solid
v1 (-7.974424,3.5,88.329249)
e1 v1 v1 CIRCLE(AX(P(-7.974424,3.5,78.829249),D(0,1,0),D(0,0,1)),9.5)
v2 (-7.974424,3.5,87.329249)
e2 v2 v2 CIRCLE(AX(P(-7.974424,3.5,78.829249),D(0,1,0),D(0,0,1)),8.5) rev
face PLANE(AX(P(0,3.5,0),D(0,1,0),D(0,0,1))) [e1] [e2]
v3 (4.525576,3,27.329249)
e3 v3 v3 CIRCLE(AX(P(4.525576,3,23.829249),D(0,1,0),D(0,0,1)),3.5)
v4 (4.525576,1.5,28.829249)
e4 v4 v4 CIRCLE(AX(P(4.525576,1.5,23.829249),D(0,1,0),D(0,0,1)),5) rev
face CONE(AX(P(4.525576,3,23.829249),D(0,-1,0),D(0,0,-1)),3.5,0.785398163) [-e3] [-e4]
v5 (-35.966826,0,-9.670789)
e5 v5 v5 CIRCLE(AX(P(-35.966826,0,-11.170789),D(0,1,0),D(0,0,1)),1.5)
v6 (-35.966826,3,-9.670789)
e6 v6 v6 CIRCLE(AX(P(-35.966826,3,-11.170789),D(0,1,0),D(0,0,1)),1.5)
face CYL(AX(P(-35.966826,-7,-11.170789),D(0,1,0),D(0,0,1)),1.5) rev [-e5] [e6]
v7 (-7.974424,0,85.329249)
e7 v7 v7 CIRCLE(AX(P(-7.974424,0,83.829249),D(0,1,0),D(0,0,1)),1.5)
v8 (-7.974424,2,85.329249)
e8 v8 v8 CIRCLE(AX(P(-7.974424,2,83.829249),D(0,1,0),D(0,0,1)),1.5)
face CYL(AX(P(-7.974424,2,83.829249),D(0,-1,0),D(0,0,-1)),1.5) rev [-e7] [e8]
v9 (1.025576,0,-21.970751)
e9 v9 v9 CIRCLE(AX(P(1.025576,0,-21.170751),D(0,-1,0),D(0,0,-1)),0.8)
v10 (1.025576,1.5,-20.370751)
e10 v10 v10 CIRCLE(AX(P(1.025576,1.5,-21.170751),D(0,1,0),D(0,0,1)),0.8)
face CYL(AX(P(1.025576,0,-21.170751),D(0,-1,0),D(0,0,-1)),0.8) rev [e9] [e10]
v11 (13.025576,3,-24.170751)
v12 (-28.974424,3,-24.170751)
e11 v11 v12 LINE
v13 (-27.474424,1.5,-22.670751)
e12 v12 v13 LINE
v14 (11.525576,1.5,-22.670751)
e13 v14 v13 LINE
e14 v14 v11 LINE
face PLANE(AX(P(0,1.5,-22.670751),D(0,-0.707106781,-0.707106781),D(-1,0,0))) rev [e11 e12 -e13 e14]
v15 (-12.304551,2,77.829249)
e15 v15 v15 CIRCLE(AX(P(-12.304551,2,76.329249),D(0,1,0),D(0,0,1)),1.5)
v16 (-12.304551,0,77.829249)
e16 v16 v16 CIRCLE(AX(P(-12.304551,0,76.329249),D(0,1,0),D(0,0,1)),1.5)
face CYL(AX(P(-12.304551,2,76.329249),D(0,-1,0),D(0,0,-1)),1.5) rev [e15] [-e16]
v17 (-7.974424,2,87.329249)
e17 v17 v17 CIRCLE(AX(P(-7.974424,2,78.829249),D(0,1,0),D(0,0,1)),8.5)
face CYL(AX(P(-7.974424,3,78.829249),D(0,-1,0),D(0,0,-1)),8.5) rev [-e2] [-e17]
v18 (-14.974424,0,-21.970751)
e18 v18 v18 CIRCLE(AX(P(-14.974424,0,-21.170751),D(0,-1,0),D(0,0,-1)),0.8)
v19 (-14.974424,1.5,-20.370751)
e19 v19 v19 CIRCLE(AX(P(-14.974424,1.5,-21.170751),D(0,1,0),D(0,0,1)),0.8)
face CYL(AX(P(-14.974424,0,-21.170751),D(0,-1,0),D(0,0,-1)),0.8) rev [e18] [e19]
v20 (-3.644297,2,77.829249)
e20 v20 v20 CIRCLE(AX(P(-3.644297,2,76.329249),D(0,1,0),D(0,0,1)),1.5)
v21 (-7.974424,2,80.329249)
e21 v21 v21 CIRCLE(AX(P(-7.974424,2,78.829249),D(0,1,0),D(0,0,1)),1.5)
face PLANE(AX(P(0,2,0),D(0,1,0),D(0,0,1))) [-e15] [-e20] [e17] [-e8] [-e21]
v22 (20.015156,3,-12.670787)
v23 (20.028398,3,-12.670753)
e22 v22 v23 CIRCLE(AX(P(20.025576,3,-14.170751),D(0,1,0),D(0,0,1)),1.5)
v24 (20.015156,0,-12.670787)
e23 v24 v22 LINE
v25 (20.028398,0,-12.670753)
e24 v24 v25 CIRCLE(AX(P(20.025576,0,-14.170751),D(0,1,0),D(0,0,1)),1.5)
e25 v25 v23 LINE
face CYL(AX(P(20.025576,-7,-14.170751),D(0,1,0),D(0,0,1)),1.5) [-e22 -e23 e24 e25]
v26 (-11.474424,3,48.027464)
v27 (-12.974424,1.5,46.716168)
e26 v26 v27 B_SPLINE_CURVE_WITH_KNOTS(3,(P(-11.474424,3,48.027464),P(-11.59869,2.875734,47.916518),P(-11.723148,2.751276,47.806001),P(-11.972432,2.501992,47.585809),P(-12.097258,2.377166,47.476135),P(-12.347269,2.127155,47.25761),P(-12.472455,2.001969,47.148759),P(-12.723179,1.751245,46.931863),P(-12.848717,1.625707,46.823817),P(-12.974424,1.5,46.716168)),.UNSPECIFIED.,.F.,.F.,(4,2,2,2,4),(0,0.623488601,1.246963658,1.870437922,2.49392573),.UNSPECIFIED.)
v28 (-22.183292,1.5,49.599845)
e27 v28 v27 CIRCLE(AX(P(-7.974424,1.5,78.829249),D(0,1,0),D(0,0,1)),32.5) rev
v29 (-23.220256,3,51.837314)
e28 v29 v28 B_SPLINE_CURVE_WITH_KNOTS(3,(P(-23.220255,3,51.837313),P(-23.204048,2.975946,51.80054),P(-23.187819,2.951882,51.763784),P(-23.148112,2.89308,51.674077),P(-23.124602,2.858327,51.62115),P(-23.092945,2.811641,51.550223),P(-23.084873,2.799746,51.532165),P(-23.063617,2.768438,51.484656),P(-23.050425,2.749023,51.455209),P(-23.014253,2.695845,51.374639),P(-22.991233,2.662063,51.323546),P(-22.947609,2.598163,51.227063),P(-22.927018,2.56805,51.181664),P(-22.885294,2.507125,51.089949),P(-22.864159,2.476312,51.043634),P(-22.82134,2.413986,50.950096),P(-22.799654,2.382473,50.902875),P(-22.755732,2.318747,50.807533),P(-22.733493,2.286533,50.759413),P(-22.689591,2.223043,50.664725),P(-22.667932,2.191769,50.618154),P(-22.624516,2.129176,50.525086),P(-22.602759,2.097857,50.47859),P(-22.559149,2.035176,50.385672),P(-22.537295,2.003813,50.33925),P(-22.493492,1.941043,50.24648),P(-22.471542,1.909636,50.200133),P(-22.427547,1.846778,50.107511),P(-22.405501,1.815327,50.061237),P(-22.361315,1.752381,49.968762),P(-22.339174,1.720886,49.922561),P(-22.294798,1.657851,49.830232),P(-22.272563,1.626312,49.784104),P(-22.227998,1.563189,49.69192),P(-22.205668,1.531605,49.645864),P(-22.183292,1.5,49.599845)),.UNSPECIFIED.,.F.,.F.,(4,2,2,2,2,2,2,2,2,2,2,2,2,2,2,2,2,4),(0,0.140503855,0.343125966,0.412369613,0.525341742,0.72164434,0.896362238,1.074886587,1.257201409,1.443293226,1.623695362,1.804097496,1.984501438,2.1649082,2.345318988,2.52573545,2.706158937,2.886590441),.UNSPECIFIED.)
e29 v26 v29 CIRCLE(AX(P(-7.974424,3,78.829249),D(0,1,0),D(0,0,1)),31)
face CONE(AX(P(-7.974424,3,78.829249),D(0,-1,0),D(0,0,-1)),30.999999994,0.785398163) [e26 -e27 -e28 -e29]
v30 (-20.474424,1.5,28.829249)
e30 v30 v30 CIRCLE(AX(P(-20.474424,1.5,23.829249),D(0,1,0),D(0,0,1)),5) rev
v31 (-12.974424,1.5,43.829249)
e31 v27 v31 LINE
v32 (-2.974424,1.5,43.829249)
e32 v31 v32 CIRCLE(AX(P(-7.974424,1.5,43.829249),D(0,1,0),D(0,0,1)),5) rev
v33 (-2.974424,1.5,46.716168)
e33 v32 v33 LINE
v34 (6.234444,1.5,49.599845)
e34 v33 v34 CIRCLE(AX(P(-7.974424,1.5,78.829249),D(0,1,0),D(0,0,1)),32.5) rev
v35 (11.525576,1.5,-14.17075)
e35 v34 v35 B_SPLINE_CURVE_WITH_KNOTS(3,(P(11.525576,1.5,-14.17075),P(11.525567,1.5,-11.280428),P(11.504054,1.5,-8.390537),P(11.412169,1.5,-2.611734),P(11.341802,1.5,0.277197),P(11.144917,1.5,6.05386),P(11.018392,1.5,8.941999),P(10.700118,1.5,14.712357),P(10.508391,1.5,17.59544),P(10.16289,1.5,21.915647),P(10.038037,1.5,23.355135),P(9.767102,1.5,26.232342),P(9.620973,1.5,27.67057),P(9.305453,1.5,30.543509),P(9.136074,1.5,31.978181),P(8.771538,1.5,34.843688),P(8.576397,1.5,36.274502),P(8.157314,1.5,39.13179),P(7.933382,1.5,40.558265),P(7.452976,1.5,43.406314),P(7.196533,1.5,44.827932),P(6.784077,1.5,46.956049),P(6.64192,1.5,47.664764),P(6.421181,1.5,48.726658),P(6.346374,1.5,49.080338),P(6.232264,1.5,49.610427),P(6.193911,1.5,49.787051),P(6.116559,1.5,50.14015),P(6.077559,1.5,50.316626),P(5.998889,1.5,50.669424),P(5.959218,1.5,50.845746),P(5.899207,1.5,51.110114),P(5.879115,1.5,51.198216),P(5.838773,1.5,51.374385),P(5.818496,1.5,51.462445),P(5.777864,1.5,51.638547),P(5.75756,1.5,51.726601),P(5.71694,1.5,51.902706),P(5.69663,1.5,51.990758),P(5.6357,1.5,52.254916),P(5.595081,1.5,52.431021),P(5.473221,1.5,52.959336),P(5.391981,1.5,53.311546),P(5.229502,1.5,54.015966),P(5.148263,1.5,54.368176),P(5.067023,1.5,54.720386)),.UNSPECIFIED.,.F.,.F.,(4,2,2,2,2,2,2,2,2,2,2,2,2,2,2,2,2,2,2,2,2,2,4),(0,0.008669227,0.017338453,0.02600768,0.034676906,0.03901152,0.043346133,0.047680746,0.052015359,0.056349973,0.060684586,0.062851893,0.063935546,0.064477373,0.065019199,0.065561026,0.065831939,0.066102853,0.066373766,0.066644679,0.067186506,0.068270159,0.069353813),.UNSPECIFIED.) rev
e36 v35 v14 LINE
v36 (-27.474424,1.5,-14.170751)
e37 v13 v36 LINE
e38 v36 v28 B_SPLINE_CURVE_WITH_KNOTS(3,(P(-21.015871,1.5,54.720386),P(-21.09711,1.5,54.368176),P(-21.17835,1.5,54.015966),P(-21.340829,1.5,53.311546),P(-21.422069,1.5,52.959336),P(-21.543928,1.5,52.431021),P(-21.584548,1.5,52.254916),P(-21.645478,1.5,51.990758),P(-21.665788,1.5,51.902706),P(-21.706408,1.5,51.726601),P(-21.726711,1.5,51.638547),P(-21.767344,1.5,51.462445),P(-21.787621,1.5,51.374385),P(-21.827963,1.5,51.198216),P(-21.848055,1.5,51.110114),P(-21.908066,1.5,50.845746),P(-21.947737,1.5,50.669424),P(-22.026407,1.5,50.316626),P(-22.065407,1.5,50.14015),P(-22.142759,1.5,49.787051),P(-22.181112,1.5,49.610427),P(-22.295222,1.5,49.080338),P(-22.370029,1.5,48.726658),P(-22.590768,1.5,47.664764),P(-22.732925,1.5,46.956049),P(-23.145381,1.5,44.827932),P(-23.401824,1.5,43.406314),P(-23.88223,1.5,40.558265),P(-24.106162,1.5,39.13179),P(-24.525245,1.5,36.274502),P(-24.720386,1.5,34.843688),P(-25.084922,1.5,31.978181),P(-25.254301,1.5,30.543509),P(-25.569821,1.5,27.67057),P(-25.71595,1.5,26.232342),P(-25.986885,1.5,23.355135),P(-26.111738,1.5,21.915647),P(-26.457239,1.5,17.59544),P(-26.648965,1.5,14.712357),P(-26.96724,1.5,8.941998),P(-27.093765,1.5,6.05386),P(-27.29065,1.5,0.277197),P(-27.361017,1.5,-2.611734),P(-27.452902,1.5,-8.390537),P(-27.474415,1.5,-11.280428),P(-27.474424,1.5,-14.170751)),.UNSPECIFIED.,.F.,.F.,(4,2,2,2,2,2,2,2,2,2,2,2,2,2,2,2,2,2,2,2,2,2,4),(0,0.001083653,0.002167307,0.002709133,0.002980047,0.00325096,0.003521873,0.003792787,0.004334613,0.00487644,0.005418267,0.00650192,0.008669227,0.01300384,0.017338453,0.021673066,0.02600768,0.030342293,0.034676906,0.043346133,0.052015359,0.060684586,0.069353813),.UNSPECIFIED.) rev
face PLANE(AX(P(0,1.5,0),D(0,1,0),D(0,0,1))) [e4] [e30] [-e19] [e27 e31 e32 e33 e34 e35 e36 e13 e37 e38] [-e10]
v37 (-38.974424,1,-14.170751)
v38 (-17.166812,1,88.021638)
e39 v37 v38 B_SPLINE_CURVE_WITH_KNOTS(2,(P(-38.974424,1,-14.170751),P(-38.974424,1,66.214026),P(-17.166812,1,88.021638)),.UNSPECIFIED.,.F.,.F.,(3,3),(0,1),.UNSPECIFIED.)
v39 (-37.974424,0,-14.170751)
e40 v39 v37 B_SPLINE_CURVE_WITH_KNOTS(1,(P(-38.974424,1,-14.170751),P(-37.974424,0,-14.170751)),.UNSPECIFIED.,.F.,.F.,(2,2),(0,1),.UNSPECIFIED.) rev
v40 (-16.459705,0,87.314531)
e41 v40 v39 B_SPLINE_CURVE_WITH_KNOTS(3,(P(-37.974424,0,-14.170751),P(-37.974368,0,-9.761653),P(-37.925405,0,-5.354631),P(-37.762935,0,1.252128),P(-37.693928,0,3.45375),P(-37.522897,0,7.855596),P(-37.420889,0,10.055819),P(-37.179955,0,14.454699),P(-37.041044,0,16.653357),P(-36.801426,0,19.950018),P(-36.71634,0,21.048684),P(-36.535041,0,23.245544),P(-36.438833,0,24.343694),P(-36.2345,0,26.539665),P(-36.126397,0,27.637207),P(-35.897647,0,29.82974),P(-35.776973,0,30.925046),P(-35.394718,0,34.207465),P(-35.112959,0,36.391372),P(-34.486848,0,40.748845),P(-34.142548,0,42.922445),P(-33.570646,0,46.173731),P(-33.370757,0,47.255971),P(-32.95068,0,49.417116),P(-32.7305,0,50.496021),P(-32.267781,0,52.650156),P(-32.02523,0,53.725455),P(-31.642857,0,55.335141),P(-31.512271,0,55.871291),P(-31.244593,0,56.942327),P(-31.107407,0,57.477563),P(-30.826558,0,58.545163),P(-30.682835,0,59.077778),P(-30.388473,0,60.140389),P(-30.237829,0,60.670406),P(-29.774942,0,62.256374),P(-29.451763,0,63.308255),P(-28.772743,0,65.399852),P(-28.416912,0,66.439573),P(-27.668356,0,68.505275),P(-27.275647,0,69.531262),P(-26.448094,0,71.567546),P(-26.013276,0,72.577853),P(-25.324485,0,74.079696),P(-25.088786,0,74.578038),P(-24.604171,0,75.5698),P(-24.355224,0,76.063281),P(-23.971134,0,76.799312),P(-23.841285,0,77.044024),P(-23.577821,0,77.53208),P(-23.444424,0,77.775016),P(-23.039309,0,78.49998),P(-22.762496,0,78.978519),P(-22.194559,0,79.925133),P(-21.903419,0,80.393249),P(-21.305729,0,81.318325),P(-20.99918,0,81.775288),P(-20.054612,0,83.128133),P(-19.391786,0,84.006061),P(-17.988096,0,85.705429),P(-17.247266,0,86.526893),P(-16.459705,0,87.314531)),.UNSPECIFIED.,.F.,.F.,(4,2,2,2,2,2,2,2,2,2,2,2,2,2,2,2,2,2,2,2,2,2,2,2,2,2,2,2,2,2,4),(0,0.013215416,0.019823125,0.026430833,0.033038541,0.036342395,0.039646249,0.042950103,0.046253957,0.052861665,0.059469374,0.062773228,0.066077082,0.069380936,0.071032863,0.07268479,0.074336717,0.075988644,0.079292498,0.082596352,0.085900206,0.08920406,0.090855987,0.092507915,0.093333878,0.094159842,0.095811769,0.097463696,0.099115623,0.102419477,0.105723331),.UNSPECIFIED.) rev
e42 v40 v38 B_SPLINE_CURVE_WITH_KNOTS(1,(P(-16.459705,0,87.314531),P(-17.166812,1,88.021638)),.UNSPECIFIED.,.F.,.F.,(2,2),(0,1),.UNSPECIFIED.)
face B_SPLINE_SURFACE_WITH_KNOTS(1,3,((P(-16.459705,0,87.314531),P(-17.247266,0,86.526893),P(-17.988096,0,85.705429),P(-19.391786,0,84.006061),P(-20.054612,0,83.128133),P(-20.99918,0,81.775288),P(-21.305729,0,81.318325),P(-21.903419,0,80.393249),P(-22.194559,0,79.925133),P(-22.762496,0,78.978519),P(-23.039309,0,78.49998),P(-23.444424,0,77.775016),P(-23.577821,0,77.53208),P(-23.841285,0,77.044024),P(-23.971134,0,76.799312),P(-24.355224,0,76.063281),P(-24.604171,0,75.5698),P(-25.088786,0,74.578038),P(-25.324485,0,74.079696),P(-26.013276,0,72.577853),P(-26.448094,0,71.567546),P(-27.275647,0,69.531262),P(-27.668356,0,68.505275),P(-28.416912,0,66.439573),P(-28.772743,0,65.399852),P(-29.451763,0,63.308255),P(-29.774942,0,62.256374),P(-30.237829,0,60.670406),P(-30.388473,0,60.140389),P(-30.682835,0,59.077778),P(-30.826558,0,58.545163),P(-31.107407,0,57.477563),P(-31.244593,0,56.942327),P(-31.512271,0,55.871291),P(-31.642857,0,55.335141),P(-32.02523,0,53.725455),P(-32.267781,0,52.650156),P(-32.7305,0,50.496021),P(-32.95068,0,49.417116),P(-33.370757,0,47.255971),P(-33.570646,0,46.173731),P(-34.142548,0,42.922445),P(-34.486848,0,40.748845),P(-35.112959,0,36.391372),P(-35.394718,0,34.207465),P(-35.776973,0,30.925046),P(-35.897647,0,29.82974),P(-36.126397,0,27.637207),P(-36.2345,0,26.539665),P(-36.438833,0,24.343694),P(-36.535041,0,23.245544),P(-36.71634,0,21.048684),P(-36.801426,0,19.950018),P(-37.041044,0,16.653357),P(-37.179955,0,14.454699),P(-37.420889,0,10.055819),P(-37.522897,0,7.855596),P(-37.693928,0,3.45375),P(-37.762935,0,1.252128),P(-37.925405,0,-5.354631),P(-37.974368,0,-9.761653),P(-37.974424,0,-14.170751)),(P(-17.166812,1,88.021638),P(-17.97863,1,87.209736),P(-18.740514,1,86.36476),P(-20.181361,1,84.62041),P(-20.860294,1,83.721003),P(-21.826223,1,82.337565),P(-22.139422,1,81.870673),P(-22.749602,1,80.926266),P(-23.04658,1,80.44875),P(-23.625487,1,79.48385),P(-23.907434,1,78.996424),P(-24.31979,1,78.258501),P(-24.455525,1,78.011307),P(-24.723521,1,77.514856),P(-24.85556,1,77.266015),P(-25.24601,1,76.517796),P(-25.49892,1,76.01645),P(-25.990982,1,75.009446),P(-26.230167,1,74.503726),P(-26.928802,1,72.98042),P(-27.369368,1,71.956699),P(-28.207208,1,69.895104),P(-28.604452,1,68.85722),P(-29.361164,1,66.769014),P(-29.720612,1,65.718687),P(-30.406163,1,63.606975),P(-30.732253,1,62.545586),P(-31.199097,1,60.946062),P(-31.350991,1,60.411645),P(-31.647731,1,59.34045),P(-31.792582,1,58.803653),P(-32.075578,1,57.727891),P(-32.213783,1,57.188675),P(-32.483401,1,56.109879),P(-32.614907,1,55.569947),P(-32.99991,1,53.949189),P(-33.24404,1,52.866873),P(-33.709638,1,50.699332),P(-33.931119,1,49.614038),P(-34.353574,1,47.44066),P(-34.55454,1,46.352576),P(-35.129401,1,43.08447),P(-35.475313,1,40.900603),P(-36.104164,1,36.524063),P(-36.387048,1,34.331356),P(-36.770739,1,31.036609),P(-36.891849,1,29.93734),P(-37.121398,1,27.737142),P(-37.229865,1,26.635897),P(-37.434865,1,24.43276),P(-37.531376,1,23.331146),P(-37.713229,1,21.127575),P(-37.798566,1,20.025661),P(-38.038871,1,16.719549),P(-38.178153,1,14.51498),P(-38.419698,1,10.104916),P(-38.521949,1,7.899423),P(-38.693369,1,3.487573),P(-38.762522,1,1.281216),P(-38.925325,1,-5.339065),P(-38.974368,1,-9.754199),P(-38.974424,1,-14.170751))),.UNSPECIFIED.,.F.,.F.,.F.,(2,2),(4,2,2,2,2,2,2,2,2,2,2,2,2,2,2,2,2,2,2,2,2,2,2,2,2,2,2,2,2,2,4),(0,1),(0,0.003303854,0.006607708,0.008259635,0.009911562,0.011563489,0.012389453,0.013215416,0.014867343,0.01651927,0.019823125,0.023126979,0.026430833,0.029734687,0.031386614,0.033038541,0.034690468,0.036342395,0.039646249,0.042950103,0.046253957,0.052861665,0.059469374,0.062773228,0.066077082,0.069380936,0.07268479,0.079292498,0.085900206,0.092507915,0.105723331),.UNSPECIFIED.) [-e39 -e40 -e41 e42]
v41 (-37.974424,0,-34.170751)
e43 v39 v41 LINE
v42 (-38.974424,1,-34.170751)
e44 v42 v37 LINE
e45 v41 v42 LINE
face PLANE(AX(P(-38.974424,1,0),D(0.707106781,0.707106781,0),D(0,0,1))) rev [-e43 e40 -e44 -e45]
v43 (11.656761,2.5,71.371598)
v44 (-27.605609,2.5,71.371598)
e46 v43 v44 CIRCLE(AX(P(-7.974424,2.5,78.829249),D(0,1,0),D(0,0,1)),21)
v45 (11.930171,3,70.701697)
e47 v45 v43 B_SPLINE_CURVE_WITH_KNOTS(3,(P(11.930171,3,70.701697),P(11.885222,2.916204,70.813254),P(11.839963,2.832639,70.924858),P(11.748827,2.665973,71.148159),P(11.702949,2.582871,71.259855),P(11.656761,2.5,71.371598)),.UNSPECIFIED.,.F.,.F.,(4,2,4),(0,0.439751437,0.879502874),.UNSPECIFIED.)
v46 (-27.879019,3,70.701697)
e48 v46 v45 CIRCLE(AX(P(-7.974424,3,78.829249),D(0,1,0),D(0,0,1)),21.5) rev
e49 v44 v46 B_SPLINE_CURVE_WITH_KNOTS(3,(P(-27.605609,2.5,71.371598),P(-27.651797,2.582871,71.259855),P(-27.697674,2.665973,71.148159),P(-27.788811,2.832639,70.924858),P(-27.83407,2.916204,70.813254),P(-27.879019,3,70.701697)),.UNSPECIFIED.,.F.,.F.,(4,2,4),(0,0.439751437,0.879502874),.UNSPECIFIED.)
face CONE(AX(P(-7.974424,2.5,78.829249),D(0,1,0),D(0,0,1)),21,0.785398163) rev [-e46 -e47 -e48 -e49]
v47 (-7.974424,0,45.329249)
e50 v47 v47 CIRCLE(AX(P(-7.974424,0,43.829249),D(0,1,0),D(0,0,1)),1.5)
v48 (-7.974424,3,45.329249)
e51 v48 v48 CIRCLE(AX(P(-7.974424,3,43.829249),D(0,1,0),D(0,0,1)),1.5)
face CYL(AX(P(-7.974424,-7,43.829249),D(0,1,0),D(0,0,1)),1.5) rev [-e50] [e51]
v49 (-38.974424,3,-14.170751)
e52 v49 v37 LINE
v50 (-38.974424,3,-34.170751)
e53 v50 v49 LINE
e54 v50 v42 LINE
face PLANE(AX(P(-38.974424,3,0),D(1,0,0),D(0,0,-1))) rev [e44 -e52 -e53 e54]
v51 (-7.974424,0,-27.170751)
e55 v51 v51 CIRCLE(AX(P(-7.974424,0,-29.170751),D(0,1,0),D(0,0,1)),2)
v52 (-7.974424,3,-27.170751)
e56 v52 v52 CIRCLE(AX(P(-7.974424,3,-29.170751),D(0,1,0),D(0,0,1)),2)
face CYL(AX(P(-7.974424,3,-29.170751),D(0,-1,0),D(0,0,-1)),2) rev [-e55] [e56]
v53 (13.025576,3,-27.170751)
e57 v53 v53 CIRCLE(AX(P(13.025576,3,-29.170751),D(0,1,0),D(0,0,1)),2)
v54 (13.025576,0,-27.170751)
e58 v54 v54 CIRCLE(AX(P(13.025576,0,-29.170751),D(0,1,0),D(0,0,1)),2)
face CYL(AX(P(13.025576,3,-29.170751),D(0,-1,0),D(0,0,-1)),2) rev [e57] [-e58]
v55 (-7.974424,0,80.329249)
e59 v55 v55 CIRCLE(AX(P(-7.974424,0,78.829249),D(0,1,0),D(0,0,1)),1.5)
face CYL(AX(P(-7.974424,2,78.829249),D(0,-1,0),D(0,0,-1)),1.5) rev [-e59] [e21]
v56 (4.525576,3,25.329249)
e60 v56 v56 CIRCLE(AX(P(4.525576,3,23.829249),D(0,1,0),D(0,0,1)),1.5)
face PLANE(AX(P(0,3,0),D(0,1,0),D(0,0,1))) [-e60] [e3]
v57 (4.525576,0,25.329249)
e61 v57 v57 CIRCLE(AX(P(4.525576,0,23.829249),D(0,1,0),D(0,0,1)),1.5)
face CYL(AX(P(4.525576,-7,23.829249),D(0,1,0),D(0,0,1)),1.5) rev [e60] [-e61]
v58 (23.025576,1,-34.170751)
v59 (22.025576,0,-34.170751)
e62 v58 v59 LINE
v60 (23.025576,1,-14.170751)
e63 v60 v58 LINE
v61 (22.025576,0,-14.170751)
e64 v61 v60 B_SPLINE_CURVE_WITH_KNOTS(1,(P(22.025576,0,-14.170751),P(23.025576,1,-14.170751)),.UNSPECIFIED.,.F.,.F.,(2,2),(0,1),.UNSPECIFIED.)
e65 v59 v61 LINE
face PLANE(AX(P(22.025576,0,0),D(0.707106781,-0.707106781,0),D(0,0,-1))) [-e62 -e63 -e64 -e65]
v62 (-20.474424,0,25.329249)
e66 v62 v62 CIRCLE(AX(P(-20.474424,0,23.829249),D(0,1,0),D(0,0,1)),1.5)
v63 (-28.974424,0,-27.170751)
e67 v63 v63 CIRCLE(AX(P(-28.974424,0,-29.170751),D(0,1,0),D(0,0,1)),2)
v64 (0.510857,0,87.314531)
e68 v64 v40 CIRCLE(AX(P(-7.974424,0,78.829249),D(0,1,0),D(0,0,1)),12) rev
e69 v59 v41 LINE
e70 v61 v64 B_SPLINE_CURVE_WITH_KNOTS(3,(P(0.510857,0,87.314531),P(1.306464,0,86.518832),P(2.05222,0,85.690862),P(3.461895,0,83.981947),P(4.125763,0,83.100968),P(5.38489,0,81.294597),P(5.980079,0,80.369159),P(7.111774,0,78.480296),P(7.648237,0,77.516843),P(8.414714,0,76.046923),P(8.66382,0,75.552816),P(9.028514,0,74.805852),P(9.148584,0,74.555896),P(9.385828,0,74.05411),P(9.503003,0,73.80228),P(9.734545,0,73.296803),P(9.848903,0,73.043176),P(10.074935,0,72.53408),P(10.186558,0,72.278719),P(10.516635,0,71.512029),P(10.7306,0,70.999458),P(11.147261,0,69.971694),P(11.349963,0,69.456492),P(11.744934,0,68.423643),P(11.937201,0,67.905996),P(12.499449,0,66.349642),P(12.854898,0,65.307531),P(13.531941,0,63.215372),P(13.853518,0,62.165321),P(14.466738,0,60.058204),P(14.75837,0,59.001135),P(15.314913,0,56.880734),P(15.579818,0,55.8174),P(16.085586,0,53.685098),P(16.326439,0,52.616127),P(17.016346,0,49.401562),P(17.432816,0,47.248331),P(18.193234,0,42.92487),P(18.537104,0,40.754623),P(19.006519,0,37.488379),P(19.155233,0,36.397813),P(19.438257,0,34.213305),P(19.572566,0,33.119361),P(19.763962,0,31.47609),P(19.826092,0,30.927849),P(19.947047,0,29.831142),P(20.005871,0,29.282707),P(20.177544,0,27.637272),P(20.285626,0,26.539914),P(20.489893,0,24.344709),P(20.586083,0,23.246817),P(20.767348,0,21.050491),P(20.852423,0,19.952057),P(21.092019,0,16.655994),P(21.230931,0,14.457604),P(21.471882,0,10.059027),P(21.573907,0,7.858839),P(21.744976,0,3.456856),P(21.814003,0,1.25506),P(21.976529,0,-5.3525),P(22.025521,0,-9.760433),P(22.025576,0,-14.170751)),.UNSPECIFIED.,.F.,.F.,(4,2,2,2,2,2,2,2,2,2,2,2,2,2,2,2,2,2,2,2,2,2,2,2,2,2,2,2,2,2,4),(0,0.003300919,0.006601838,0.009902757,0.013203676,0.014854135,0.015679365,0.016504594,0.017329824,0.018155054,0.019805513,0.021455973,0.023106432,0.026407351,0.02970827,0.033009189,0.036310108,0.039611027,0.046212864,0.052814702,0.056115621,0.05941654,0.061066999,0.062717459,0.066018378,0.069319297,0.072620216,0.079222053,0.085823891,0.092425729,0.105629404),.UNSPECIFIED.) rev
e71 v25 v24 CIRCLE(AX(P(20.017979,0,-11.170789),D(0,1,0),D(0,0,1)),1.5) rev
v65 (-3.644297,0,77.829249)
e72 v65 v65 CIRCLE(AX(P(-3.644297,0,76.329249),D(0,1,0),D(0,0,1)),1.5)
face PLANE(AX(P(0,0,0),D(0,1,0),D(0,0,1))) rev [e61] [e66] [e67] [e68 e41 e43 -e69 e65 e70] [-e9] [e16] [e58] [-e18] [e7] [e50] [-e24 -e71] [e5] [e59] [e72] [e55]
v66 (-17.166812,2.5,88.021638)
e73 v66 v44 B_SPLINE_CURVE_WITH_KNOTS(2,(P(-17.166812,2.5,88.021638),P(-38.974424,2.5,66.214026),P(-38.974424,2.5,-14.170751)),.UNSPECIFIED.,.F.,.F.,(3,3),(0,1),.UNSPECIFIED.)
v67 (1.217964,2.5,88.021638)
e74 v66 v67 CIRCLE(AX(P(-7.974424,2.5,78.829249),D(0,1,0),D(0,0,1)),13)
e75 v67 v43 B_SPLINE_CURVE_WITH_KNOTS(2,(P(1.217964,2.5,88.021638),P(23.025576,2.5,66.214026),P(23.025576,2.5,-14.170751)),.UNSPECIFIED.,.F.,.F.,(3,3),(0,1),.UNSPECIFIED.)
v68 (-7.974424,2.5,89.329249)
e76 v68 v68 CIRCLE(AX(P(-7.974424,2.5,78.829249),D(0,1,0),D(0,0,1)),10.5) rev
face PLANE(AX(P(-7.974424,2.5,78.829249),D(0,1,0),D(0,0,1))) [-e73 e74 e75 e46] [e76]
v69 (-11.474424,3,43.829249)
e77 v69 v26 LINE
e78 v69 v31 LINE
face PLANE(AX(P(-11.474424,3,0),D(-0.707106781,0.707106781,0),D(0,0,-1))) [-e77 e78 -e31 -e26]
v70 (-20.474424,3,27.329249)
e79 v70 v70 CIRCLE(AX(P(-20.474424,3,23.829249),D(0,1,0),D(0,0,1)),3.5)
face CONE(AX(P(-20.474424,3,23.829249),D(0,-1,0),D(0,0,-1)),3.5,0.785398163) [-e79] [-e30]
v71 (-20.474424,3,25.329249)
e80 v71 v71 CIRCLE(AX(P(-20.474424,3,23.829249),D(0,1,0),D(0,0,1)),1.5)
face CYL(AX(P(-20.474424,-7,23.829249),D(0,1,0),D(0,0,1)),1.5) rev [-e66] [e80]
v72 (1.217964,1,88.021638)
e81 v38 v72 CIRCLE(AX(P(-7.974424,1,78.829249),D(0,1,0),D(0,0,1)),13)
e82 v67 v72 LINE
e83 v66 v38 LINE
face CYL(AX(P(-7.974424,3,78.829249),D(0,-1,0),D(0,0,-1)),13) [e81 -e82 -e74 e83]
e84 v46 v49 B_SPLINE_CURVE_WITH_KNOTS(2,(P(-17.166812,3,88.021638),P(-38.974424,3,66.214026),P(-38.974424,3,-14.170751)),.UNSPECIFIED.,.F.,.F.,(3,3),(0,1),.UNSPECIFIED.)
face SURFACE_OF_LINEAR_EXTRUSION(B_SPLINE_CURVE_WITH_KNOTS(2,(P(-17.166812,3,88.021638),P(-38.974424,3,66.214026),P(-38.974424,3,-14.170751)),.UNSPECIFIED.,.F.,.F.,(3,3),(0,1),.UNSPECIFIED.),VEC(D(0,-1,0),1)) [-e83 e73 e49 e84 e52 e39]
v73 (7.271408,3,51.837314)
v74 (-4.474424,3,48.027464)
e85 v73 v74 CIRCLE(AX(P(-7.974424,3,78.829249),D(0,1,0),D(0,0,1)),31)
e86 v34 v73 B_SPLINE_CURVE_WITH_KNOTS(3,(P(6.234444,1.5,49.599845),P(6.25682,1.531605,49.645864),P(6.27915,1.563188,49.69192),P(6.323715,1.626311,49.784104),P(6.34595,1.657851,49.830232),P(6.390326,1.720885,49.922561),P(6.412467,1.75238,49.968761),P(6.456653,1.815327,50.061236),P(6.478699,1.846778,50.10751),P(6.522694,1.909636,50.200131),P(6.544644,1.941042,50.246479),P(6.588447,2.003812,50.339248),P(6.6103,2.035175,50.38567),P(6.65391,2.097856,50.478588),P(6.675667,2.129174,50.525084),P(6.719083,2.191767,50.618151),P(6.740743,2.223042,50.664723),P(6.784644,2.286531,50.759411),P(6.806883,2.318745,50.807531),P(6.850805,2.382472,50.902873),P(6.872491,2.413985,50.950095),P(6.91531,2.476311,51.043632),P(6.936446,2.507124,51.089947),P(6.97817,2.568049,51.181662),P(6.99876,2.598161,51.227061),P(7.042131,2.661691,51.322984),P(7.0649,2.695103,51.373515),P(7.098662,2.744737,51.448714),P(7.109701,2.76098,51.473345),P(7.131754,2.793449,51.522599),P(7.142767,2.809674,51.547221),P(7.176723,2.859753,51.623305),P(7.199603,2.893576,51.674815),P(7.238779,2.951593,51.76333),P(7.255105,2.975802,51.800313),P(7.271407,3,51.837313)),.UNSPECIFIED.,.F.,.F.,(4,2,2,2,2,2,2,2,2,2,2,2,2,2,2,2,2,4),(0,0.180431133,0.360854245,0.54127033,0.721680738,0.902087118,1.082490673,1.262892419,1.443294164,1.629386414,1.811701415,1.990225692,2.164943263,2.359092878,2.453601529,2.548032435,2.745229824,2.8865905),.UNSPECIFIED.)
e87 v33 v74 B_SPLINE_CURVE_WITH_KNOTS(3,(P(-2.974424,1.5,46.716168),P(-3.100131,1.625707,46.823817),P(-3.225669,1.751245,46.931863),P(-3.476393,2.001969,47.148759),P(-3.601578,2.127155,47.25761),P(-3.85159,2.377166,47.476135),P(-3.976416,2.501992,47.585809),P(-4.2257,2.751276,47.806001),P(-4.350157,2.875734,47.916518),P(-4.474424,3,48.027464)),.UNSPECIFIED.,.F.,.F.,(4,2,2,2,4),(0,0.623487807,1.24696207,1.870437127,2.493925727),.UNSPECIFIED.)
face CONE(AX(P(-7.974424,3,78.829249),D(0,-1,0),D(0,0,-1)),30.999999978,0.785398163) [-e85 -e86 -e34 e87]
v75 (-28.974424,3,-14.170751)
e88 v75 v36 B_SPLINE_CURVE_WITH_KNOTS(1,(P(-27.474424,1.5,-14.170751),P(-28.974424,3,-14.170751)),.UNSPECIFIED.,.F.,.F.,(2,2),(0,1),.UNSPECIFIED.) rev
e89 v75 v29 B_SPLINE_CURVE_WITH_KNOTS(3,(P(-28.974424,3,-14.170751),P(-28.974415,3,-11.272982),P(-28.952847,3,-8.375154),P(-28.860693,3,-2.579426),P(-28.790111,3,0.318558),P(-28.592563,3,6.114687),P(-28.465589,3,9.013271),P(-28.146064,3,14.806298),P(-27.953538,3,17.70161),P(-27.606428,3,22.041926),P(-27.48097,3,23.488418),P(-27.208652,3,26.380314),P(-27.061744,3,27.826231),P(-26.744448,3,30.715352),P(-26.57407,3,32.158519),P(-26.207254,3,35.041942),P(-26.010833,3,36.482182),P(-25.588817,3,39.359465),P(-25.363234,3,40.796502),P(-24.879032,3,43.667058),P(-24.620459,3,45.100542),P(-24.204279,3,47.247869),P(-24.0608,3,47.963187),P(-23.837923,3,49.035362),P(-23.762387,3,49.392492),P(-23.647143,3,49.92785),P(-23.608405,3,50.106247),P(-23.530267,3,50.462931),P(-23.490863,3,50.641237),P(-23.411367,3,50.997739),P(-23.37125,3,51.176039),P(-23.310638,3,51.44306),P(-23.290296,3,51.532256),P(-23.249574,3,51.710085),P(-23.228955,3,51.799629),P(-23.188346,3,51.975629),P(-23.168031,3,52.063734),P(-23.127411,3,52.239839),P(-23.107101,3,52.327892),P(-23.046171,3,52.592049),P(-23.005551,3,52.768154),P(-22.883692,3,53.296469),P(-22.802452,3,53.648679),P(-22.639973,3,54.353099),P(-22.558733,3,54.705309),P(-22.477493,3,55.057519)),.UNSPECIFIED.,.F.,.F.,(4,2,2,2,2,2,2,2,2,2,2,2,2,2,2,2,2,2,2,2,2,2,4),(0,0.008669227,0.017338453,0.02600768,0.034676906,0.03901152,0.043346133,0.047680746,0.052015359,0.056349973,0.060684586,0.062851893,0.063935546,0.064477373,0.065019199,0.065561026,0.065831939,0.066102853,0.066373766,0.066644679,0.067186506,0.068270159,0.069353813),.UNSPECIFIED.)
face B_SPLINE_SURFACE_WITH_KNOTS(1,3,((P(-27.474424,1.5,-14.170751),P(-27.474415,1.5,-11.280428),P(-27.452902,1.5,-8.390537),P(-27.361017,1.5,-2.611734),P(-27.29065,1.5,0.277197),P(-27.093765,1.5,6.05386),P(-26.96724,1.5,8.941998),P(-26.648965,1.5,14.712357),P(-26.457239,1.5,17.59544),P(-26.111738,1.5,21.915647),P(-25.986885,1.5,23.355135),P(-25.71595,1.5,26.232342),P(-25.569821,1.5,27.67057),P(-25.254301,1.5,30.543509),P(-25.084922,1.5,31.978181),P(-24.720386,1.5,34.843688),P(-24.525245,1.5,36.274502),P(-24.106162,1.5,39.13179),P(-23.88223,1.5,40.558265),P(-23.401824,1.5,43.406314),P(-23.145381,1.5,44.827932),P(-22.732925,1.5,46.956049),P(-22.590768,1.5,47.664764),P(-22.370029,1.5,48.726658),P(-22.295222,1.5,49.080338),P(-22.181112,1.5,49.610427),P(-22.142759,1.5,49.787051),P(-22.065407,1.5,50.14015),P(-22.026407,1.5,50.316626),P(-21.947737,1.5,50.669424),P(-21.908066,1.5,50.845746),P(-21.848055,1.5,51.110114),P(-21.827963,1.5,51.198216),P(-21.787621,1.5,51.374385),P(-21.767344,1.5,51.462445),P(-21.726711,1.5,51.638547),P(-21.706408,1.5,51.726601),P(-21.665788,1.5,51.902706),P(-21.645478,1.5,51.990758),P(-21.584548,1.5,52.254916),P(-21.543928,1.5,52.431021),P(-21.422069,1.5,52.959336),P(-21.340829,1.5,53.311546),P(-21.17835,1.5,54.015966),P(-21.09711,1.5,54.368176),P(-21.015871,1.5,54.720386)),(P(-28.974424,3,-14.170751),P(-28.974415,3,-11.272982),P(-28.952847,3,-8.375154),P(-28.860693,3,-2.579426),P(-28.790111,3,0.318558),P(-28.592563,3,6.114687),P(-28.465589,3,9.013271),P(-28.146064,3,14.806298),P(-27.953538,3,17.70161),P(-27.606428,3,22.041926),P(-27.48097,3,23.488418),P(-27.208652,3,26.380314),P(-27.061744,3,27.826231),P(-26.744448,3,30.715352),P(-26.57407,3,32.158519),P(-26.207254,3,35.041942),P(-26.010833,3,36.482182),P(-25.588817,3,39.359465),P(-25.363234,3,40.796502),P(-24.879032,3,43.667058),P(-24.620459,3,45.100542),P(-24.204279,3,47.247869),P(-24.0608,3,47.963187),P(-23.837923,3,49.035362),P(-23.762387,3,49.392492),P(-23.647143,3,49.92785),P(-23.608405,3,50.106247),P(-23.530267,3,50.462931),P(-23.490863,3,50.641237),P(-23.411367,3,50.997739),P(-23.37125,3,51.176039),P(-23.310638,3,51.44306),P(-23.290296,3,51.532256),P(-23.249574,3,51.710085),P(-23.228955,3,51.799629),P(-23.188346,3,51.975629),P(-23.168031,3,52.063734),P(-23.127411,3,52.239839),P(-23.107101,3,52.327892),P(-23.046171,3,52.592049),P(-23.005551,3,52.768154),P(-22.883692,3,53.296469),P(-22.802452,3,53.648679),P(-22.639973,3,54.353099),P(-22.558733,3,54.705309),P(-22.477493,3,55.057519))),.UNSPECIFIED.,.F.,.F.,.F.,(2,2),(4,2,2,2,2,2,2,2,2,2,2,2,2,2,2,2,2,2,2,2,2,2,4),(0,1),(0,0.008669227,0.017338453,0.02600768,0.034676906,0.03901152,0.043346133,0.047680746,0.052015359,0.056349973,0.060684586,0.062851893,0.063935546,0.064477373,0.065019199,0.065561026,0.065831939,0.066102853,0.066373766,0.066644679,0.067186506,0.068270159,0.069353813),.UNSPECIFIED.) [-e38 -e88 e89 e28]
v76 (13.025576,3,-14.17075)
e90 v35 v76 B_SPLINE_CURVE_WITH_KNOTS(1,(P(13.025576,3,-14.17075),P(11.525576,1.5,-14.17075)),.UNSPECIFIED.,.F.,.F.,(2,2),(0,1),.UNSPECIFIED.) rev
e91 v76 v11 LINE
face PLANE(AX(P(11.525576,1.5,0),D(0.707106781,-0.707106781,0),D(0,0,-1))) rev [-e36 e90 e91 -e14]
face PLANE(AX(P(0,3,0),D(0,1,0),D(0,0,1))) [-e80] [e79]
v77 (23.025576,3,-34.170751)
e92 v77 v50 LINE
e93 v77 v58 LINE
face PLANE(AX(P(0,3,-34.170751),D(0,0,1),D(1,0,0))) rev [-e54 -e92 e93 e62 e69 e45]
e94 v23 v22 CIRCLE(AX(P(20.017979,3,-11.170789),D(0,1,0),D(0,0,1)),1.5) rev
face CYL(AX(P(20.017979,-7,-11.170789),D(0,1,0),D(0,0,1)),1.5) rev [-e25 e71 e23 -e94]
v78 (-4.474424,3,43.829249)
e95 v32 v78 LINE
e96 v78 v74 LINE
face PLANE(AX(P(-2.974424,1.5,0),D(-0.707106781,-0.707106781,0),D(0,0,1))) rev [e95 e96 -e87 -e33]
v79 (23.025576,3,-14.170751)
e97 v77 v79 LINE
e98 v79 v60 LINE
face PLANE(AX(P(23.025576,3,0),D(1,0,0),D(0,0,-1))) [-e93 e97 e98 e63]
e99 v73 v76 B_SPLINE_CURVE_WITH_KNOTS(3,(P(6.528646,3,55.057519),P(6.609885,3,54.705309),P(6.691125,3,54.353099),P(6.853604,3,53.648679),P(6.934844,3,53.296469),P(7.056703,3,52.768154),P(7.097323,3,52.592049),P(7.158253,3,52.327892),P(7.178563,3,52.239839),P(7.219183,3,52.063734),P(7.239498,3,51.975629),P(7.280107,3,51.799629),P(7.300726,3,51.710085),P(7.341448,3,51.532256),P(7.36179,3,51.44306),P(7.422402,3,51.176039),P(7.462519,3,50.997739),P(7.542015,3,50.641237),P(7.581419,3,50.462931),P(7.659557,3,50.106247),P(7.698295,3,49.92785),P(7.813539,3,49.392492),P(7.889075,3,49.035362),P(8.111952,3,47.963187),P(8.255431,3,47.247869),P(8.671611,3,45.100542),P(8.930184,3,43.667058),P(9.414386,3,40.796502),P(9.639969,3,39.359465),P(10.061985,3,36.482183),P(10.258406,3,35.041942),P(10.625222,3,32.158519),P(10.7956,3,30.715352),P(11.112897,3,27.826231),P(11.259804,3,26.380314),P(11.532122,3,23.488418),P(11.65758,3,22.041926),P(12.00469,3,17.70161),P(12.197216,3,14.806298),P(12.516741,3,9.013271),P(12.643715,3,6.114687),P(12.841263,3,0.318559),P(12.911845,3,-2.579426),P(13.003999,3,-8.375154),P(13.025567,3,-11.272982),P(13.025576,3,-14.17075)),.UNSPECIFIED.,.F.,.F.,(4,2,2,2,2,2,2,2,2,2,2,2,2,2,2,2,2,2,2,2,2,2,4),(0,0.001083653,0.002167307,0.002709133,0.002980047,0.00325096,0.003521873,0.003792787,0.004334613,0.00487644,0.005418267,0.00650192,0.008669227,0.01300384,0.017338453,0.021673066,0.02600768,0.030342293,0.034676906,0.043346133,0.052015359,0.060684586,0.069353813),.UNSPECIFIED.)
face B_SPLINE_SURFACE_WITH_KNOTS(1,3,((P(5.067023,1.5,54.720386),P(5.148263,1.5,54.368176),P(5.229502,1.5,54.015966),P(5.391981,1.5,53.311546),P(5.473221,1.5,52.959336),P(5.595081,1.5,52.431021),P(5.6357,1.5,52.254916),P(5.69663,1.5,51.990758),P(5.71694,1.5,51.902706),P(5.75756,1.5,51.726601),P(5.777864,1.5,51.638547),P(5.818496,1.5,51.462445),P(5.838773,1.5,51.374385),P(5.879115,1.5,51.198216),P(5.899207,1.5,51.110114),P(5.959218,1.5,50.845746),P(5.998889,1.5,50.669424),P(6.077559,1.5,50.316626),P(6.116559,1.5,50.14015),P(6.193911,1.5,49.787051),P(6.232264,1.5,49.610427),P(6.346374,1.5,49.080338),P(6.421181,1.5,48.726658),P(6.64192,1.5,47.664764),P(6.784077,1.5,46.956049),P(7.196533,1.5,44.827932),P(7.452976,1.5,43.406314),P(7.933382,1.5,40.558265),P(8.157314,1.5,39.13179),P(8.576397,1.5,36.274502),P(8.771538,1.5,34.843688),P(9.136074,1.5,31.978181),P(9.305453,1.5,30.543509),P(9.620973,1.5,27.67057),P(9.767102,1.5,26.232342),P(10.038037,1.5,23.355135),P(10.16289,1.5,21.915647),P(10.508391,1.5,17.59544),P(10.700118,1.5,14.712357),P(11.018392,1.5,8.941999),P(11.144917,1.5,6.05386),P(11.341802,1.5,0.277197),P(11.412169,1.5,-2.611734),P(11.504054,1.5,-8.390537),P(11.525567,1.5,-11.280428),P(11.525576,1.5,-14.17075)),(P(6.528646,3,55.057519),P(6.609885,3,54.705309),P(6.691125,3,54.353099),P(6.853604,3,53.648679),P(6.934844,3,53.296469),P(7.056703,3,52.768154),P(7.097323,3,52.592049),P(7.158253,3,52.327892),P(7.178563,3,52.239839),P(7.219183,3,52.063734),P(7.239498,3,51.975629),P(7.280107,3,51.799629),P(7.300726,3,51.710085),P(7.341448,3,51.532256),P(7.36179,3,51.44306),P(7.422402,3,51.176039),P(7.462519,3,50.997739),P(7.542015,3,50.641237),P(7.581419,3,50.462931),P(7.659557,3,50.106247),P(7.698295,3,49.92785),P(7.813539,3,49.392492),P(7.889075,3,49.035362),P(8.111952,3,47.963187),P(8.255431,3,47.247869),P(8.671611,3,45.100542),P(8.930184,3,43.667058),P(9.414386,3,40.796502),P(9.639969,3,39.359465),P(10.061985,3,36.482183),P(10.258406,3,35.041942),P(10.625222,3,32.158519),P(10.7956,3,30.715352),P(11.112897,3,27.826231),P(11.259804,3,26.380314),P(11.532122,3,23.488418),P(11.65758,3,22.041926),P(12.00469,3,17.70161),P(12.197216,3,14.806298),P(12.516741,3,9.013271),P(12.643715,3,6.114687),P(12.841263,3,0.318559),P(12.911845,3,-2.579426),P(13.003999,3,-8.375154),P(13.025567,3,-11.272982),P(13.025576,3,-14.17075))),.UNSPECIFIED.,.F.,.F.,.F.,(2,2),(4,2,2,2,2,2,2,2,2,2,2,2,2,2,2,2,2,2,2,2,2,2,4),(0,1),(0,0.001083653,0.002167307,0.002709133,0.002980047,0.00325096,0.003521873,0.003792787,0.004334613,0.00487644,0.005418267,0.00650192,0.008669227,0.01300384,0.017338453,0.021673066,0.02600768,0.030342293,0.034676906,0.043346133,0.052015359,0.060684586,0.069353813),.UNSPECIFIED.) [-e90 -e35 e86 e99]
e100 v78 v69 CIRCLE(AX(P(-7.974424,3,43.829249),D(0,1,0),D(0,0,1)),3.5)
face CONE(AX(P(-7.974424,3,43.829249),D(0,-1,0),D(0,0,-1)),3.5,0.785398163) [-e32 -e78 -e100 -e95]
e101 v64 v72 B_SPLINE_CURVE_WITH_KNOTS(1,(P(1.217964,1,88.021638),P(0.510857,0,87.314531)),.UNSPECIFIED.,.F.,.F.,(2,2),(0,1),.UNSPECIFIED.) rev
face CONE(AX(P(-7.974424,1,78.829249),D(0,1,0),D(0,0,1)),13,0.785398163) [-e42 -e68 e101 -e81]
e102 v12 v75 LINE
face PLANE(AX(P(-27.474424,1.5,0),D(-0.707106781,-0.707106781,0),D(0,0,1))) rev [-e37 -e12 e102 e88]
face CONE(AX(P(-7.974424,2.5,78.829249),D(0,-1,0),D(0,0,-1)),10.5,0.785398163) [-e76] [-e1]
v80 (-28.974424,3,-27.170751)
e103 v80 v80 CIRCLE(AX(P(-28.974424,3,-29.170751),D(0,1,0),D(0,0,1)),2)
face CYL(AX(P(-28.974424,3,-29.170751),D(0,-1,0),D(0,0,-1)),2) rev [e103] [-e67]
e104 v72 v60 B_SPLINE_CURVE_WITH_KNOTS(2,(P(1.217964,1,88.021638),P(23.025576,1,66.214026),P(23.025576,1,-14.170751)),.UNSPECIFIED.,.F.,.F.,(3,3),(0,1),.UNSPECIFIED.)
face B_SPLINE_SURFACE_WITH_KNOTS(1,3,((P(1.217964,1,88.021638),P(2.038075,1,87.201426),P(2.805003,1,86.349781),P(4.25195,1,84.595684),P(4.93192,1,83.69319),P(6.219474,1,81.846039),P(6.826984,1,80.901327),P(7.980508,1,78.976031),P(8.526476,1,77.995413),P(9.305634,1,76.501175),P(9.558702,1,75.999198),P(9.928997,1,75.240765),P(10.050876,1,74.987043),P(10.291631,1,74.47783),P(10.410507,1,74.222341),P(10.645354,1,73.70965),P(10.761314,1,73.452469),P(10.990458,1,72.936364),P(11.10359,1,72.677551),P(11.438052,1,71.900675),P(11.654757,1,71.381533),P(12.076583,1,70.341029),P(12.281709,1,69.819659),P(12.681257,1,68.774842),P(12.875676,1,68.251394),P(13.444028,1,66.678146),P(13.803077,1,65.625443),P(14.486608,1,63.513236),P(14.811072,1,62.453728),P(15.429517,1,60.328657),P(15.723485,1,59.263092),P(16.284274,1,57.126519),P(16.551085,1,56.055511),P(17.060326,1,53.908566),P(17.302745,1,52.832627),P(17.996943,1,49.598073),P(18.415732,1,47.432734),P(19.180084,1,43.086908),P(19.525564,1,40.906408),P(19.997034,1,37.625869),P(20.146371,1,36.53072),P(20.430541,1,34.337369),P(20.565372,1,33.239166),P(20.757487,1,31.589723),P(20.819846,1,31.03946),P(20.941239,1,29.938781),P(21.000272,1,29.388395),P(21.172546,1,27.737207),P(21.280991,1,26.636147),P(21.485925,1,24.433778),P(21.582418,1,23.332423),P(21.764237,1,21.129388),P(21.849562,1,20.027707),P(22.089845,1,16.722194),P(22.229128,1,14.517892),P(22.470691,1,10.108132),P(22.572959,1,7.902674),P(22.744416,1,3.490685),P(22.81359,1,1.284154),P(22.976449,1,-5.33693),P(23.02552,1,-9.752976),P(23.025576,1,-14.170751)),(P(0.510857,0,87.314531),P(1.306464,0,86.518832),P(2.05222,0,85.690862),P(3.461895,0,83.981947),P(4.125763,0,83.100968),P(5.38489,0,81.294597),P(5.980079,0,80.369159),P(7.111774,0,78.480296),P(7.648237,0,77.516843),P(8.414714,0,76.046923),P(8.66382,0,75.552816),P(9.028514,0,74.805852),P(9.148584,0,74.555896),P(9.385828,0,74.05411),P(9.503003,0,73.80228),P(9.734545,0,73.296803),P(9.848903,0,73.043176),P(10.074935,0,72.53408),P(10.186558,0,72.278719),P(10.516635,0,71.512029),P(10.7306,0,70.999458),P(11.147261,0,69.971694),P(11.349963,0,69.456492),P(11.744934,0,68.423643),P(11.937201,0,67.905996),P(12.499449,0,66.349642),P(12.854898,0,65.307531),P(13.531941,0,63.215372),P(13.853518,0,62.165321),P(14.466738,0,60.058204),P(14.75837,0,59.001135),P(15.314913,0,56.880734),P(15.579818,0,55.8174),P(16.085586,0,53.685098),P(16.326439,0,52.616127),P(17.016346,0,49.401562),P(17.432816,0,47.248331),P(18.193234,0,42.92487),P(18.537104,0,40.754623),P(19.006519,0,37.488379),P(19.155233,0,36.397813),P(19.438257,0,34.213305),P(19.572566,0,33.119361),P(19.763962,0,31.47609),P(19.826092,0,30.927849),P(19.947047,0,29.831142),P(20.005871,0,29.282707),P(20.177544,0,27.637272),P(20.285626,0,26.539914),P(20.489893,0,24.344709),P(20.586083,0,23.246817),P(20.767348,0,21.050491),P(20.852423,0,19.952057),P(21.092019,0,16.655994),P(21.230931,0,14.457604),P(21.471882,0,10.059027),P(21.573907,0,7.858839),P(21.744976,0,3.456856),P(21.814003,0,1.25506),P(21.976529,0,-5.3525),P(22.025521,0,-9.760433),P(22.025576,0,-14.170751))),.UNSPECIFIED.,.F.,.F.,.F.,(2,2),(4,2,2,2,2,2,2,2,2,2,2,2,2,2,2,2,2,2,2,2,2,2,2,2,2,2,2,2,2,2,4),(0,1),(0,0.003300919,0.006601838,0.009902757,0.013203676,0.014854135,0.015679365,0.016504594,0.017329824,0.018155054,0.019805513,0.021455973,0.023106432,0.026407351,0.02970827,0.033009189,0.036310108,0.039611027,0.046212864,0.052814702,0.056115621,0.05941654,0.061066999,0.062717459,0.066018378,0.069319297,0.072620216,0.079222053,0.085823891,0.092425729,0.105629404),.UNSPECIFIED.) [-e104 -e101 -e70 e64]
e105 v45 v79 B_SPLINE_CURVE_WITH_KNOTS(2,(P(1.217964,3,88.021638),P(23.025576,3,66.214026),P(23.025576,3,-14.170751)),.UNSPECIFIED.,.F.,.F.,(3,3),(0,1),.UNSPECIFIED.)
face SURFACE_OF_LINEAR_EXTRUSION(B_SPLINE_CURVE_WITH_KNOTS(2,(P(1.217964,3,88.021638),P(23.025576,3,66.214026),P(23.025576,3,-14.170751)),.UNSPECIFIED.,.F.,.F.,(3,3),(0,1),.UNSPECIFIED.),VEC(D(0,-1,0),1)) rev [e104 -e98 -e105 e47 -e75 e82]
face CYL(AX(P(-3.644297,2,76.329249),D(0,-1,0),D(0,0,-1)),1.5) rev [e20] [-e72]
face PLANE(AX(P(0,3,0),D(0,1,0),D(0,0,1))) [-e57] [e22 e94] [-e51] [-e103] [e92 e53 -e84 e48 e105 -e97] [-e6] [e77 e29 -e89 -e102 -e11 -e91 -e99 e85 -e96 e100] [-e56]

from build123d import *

# Parameters (mm, degrees)
EXTRUDE_1_OUTLINE_R     = 8.5
EXTRUDE_1_OUTLINE_R_2   = 2
EXTRUDE_1_DEPTH         = 3
SKETCH_2_5_R            = 8.5
SKETCH_2_5_R_2          = 1.5
EXTRUDE_3_DEPTH         = 2
CUT_EXTRUDE_START       = -3
CUT_EXTRUDE_1_OUTLINE_R = 1.5
CUT_EXTRUDE_1_DEPTH     = 3
SKETCH_14_R             = 21
SKETCH_14_R_2           = 11
CUT_EXTRUDE_2_DEPTH     = 0.5
SKETCH_15_R             = 9.5
SKETCH_15_R_2           = 8.5
EXTRUDE_4_DEPTH         = 0.5
SKETCH_15_3_R           = 11
SKETCH_15_3_R_2         = 9.5
CUT_EXTRUDE_3_DEPTH     = 0.5
SKETCH_17_R             = 3.5
CUT_EXTRUDE_4_DEPTH     = 1.5
HOLE_WIZARD_M2_1_D      = 1.6
CHAMFER_1_SIZE          = 0.5
CHAMFER_2_SIZE          = 1
CHAMFER_3_SIZE          = 1
CHAMFER_4_SIZE          = 1.5


# Read off the part's stored shape, not the designer's step: 凸台-拉伸1, 切除-拉伸1
with BuildPart() as part:
    # 凸台-拉伸1 outline → 凸台-拉伸1 (new body)
    with BuildSketch(Plane(origin=(0, 0, 0), x_dir=(1, 0, 0), z_dir=(0, 1, 0))):
        with BuildLine():
            add(Edge.make_bspline(
                [(-17.166812063, -88.021637563), (-38.974423907, -66.214025718), (-38.974423907, 14.170750592)],
                knots=[0, 0, 0, 1, 1, 1], degree=2))
            ThreePointArc((-17.166812063, -88.021637563), (-7.974423908, -91.829249408), (1.217964248, -88.021637563))
            add(Edge.make_bspline(
                [(1.217964248, -88.021637563), (23.025576093, -66.214025718), (23.025576093, 14.170750592)],
                knots=[0, 0, 0, 1, 1, 1], degree=2))
            Line((23.025576093, 14.170750592), (23.025576093, 34.170750592))
            Line((23.025576093, 34.170750592), (-38.974423907, 34.170750592))
            Line((-38.974423907, 34.170750592), (-38.974423907, 14.170750592))
        make_face()
        with Locations((-7.974423907, -78.829249408)):
            Circle(EXTRUDE_1_OUTLINE_R, mode=Mode.SUBTRACT)
        with Locations((-28.974423907, 29.170750592)):
            Circle(EXTRUDE_1_OUTLINE_R_2, mode=Mode.SUBTRACT)
        with Locations((-7.974423907, 29.170750592)):
            Circle(EXTRUDE_1_OUTLINE_R_2, mode=Mode.SUBTRACT)
        with Locations((13.025576093, 29.170750592)):
            Circle(EXTRUDE_1_OUTLINE_R_2, mode=Mode.SUBTRACT)
    extrude(amount=EXTRUDE_1_DEPTH)

    # 草图2<5> → 凸台-拉伸3 (add)
    with BuildSketch(Plane(origin=(0, 0, 0), x_dir=(1, 0, 0), z_dir=(0, 1, 0))):
        with Locations(Location((-7.974423907, -78.829249408, 0), (0, 0, 270))):
            Circle(SKETCH_2_5_R)
        with Locations(Location((-7.974423907, -78.829249408, 0), (0, 0, 270))):
            Circle(SKETCH_2_5_R_2, mode=Mode.SUBTRACT)
        with Locations(Location((-7.974423907, -83.829249408, 0), (0, 0, 270))):
            Circle(SKETCH_2_5_R_2, mode=Mode.SUBTRACT)
        with Locations(Location((-12.304550926, -76.329249408, 0), (0, 0, 270))):
            Circle(SKETCH_2_5_R_2, mode=Mode.SUBTRACT)
        with Locations(Location((-3.644296889, -76.329249408, 0), (0, 0, 270))):
            Circle(SKETCH_2_5_R_2, mode=Mode.SUBTRACT)
    extrude(amount=EXTRUDE_3_DEPTH)

    # 切除-拉伸1 outline → 切除-拉伸1 (cut)
    with BuildSketch(Plane(origin=(0, 3, 0), x_dir=(1, 0, 0), z_dir=(0, 1, 0)).offset(CUT_EXTRUDE_START)):
        with Locations((-20.474423907, -23.829249408)):
            Circle(CUT_EXTRUDE_1_OUTLINE_R)
        with Locations((-7.974423907, -43.829249408)):
            Circle(CUT_EXTRUDE_1_OUTLINE_R)
        with Locations((4.525576093, -23.829249408)):
            Circle(CUT_EXTRUDE_1_OUTLINE_R)
        with Locations((-35.966826399, 11.170789443)):
            Circle(CUT_EXTRUDE_1_OUTLINE_R)
        with BuildLine():
            ThreePointArc((20.028398358, 12.670753252), (20.021777301, 12.670755407), (20.015156318, 12.670786788))
            ThreePointArc((20.015156318, 12.670786788), (20.014179778, 9.670794253), (20.028398358, 12.670753252))
        make_face()
    extrude(amount=CUT_EXTRUDE_1_DEPTH, mode=Mode.SUBTRACT)

    # 草图14 → 切除-拉伸2 (cut)
    with BuildSketch(Plane(origin=(0, 3, 0), x_dir=(1, 0, 0), z_dir=(0, 1, 0))):
        with Locations((-7.974423907, -78.829249408)):
            Circle(SKETCH_14_R)
        with Locations(Location((-7.974423907, -78.829249408, 0), (0, 0, 270))):
            Circle(SKETCH_14_R_2, mode=Mode.SUBTRACT)
    extrude(amount=-CUT_EXTRUDE_2_DEPTH, mode=Mode.SUBTRACT)

    # 草图15 → 凸台-拉伸4 (add)
    with BuildSketch(Plane(origin=(0, 3, 0), x_dir=(1, 0, 0), z_dir=(0, 1, 0))):
        with Locations(Location((-7.974423907, -78.829249408, 0), (0, 0, 270))):
            Circle(SKETCH_15_R)
        with Locations(Location((-7.974423907, -78.829249408, 0), (0, 0, 270))):
            Circle(SKETCH_15_R_2, mode=Mode.SUBTRACT)
    extrude(amount=EXTRUDE_4_DEPTH)

    # 草图15<3> → 切除-拉伸3 (cut)
    with BuildSketch(Plane(origin=(0, 3, 0), x_dir=(1, 0, 0), z_dir=(0, 1, 0))):
        with Locations((-7.974423907, -78.829249408)):
            Circle(SKETCH_15_3_R)
        with Locations(Location((-7.974423907, -78.829249408, 0), (0, 0, 270))):
            Circle(SKETCH_15_3_R_2, mode=Mode.SUBTRACT)
    extrude(amount=-CUT_EXTRUDE_3_DEPTH, mode=Mode.SUBTRACT)

    # 草图17 → 切除-拉伸4 (cut)
    with BuildSketch(Plane(origin=(0, 3, 0), x_dir=(1, 0, 0), z_dir=(0, 1, 0))):
        with BuildLine():
            Line((13.025576092, 14.170750422), (13.025576093, 24.170750592))
            Line((13.025576093, 24.170750592), (-28.974423907, 24.170750592))
            Line((-28.974423907, 24.170750592), (-28.974423907, 14.170750592))
            add(Edge.make_bspline(
                [(-28.974423907, 14.170750592), (-28.974423907, 13.311861342), (-28.970577127, 11.586194366), (-28.947516149, 8.198019857), (-28.889914894, 4.037728889), (-28.774892402, -0.820742579), (-28.560545128, -7.124589729), (-28.178715271, -14.674765284), (-27.540114076, -23.204861593), (-26.723596489, -31.200556861), (-25.89763435, -37.41453686), (-25.151910121, -42.11313709), (-24.550677966, -45.500866022), (-24.016057668, -48.206887938), (-23.56719588, -50.307521536), (-23.33835214, -51.325314161), (-23.220255995, -51.837313496)],
                knots=[0.495235673, 0.495235673, 0.495235673, 0.495235673, 0.495300523, 0.495365373, 0.495495073, 0.495624773, 0.495754473, 0.496013874, 0.496273274, 0.496532675, 0.496792075, 0.496921775, 0.497051475, 0.497181176, 0.497246026, 0.497310876, 0.497310876, 0.497310876, 0.497310876], degree=3))
            ThreePointArc((-23.220255995, -51.837313496), (-17.53895703, -49.341629884), (-11.474423907, -48.027463761))
            Line((-11.474423907, -48.027463761), (-11.474423907, -43.829249408))
            ThreePointArc((-11.474423907, -43.829249408), (-7.974423907, -40.329249408), (-4.474423907, -43.829249408))
            Line((-4.474423907, -43.829249408), (-4.474423907, -48.027463766))
            ThreePointArc((-4.474423907, -48.027463766), (1.590109217, -49.341629893), (7.271408173, -51.837313525))
            add(Edge.make_bspline(
                [(7.271408173, -51.837313525), (7.389504318, -51.325314191), (7.618348058, -50.307521568), (8.067209846, -48.206887974), (8.601830143, -45.500866064), (9.203062298, -42.113137138), (9.948786527, -37.414536918), (10.774748665, -31.200556932), (11.591266253, -23.20486168), (12.22986745, -14.674765389), (12.611697308, -7.124589851), (12.826044583, -0.820742715), (12.941067076, 4.037728742), (12.998668332, 8.198019701), (13.021729311, 11.586194202), (13.025576092, 13.311861174), (13.025576092, 14.170750422)],
                knots=[0.502689124, 0.502689124, 0.502689124, 0.502689124, 0.502753974, 0.502818824, 0.502948525, 0.503078225, 0.503207925, 0.503467325, 0.503726726, 0.503986126, 0.504245527, 0.504375227, 0.504504927, 0.504634627, 0.504699477, 0.504764327, 0.504764327, 0.504764327, 0.504764327], degree=3))
        make_face()
        with Locations(Location((-20.474423907, -23.829249408, 0), (0, 0, 270))):
            Circle(SKETCH_17_R, mode=Mode.SUBTRACT)
        with Locations(Location((4.525576093, -23.829249408, 0), (0, 0, 270))):
            Circle(SKETCH_17_R, mode=Mode.SUBTRACT)
    extrude(amount=-CUT_EXTRUDE_4_DEPTH, mode=Mode.SUBTRACT)

    # M2 螺纹孔1 (through all)
    with Locations(Plane(origin=(-14.974423907, 0, -21.170750592), x_dir=(0, 0, -1), z_dir=(0, -1, 0))):
        with Locations((0, 0), (0, 16)):
            Hole(HOLE_WIZARD_M2_1_D / 2)

    # 倒角1
    chamfer_1_edges = [part.edges().sort_by_distance(p)[0] for p in [
        (-7.974423907, 3, 57.829249408),
    ]]
    chamfer(chamfer_1_edges, length=CHAMFER_1_SIZE - 0.0001)  # a hair under: the kernel refuses the full size

    # 倒角2
    chamfer_2_edges = [part.edges().sort_by_distance(p)[0] for p in [
        (-38.974423907, 0, -24.170750592),
        (23.025576093, 0, -24.170750592),
        (-7.974423907, 0, 91.829249408),
    ]]
    chamfer(chamfer_2_edges, length=CHAMFER_2_SIZE)

    # 倒角3
    chamfer_3_edges = [part.edges().sort_by_distance(p)[0] for p in [
        (-7.974423907, 2.5, 69.329249408),
    ]]
    chamfer(chamfer_3_edges, length=CHAMFER_3_SIZE - 0.0001)  # a hair under: the kernel refuses the full size

    # 倒角4
    chamfer_4_edges = [part.edges().sort_by_distance(p)[0] for p in [
        (1.590109217, 1.5, 49.341629893),
    ]]
    chamfer(chamfer_4_edges, length=CHAMFER_4_SIZE - 0.0001)  # a hair under: the kernel refuses the full size
    chamfer_4_2_edges = [part.edges().sort_by_distance(p)[0] for p in [
        (-4.474423907, 1.5, 45.173805289),
        (-7.974423907, 1.5, 40.329249408),
        (-11.474423907, 1.5, 45.928356584),
    ]]
    chamfer(chamfer_4_2_edges, length=CHAMFER_4_SIZE - 0.0001)  # a hair under: the kernel refuses the full size
    chamfer_4_3_edges = [part.edges().sort_by_distance(p)[0] for p in [
        (-18.256270706, 1.5, 49.584016882),
    ]]
    chamfer(chamfer_4_3_edges, length=CHAMFER_4_SIZE - 0.0001)  # a hair under: the kernel refuses the full size
    chamfer_4_4_edges = [part.edges().sort_by_distance(p)[0] for p in [
        (-27.599295062, 1.5, 22.087266062),
        (-28.974423907, 1.5, -19.170750592),
    ]]
    chamfer(chamfer_4_4_edges, length=CHAMFER_4_SIZE - 0.0001)  # a hair under: the kernel refuses the full size
    chamfer_4_5_edges = [part.edges().sort_by_distance(p)[0] for p in [
        (-7.224473907, 1.5, -24.170750592),
    ]]
    chamfer(chamfer_4_5_edges, length=CHAMFER_4_SIZE - 0.0001)  # a hair under: the kernel refuses the full size
    chamfer_4_6_edges = [part.edges().sort_by_distance(p)[0] for p in [
        (13.025576092, 1.5, -18.420800507),
        (11.65044724, 1.5, 22.087266148),
    ]]
    chamfer(chamfer_4_6_edges, length=CHAMFER_4_SIZE - 0.0001)  # a hair under: the kernel refuses the full size
    chamfer_4_7_edges = [part.edges().sort_by_distance(p)[0] for p in [
        (-20.474423907, 1.5, 20.329249408),
    ]]
    chamfer(chamfer_4_7_edges, length=CHAMFER_4_SIZE - 0.0001)  # a hair under: the kernel refuses the full size
    chamfer_4_8_edges = [part.edges().sort_by_distance(p)[0] for p in [
        (4.525576093, 1.5, 20.329249408),
    ]]
    chamfer(chamfer_4_8_edges, length=CHAMFER_4_SIZE - 0.0001)  # a hair under: the kernel refuses the full size


solid = part.part
